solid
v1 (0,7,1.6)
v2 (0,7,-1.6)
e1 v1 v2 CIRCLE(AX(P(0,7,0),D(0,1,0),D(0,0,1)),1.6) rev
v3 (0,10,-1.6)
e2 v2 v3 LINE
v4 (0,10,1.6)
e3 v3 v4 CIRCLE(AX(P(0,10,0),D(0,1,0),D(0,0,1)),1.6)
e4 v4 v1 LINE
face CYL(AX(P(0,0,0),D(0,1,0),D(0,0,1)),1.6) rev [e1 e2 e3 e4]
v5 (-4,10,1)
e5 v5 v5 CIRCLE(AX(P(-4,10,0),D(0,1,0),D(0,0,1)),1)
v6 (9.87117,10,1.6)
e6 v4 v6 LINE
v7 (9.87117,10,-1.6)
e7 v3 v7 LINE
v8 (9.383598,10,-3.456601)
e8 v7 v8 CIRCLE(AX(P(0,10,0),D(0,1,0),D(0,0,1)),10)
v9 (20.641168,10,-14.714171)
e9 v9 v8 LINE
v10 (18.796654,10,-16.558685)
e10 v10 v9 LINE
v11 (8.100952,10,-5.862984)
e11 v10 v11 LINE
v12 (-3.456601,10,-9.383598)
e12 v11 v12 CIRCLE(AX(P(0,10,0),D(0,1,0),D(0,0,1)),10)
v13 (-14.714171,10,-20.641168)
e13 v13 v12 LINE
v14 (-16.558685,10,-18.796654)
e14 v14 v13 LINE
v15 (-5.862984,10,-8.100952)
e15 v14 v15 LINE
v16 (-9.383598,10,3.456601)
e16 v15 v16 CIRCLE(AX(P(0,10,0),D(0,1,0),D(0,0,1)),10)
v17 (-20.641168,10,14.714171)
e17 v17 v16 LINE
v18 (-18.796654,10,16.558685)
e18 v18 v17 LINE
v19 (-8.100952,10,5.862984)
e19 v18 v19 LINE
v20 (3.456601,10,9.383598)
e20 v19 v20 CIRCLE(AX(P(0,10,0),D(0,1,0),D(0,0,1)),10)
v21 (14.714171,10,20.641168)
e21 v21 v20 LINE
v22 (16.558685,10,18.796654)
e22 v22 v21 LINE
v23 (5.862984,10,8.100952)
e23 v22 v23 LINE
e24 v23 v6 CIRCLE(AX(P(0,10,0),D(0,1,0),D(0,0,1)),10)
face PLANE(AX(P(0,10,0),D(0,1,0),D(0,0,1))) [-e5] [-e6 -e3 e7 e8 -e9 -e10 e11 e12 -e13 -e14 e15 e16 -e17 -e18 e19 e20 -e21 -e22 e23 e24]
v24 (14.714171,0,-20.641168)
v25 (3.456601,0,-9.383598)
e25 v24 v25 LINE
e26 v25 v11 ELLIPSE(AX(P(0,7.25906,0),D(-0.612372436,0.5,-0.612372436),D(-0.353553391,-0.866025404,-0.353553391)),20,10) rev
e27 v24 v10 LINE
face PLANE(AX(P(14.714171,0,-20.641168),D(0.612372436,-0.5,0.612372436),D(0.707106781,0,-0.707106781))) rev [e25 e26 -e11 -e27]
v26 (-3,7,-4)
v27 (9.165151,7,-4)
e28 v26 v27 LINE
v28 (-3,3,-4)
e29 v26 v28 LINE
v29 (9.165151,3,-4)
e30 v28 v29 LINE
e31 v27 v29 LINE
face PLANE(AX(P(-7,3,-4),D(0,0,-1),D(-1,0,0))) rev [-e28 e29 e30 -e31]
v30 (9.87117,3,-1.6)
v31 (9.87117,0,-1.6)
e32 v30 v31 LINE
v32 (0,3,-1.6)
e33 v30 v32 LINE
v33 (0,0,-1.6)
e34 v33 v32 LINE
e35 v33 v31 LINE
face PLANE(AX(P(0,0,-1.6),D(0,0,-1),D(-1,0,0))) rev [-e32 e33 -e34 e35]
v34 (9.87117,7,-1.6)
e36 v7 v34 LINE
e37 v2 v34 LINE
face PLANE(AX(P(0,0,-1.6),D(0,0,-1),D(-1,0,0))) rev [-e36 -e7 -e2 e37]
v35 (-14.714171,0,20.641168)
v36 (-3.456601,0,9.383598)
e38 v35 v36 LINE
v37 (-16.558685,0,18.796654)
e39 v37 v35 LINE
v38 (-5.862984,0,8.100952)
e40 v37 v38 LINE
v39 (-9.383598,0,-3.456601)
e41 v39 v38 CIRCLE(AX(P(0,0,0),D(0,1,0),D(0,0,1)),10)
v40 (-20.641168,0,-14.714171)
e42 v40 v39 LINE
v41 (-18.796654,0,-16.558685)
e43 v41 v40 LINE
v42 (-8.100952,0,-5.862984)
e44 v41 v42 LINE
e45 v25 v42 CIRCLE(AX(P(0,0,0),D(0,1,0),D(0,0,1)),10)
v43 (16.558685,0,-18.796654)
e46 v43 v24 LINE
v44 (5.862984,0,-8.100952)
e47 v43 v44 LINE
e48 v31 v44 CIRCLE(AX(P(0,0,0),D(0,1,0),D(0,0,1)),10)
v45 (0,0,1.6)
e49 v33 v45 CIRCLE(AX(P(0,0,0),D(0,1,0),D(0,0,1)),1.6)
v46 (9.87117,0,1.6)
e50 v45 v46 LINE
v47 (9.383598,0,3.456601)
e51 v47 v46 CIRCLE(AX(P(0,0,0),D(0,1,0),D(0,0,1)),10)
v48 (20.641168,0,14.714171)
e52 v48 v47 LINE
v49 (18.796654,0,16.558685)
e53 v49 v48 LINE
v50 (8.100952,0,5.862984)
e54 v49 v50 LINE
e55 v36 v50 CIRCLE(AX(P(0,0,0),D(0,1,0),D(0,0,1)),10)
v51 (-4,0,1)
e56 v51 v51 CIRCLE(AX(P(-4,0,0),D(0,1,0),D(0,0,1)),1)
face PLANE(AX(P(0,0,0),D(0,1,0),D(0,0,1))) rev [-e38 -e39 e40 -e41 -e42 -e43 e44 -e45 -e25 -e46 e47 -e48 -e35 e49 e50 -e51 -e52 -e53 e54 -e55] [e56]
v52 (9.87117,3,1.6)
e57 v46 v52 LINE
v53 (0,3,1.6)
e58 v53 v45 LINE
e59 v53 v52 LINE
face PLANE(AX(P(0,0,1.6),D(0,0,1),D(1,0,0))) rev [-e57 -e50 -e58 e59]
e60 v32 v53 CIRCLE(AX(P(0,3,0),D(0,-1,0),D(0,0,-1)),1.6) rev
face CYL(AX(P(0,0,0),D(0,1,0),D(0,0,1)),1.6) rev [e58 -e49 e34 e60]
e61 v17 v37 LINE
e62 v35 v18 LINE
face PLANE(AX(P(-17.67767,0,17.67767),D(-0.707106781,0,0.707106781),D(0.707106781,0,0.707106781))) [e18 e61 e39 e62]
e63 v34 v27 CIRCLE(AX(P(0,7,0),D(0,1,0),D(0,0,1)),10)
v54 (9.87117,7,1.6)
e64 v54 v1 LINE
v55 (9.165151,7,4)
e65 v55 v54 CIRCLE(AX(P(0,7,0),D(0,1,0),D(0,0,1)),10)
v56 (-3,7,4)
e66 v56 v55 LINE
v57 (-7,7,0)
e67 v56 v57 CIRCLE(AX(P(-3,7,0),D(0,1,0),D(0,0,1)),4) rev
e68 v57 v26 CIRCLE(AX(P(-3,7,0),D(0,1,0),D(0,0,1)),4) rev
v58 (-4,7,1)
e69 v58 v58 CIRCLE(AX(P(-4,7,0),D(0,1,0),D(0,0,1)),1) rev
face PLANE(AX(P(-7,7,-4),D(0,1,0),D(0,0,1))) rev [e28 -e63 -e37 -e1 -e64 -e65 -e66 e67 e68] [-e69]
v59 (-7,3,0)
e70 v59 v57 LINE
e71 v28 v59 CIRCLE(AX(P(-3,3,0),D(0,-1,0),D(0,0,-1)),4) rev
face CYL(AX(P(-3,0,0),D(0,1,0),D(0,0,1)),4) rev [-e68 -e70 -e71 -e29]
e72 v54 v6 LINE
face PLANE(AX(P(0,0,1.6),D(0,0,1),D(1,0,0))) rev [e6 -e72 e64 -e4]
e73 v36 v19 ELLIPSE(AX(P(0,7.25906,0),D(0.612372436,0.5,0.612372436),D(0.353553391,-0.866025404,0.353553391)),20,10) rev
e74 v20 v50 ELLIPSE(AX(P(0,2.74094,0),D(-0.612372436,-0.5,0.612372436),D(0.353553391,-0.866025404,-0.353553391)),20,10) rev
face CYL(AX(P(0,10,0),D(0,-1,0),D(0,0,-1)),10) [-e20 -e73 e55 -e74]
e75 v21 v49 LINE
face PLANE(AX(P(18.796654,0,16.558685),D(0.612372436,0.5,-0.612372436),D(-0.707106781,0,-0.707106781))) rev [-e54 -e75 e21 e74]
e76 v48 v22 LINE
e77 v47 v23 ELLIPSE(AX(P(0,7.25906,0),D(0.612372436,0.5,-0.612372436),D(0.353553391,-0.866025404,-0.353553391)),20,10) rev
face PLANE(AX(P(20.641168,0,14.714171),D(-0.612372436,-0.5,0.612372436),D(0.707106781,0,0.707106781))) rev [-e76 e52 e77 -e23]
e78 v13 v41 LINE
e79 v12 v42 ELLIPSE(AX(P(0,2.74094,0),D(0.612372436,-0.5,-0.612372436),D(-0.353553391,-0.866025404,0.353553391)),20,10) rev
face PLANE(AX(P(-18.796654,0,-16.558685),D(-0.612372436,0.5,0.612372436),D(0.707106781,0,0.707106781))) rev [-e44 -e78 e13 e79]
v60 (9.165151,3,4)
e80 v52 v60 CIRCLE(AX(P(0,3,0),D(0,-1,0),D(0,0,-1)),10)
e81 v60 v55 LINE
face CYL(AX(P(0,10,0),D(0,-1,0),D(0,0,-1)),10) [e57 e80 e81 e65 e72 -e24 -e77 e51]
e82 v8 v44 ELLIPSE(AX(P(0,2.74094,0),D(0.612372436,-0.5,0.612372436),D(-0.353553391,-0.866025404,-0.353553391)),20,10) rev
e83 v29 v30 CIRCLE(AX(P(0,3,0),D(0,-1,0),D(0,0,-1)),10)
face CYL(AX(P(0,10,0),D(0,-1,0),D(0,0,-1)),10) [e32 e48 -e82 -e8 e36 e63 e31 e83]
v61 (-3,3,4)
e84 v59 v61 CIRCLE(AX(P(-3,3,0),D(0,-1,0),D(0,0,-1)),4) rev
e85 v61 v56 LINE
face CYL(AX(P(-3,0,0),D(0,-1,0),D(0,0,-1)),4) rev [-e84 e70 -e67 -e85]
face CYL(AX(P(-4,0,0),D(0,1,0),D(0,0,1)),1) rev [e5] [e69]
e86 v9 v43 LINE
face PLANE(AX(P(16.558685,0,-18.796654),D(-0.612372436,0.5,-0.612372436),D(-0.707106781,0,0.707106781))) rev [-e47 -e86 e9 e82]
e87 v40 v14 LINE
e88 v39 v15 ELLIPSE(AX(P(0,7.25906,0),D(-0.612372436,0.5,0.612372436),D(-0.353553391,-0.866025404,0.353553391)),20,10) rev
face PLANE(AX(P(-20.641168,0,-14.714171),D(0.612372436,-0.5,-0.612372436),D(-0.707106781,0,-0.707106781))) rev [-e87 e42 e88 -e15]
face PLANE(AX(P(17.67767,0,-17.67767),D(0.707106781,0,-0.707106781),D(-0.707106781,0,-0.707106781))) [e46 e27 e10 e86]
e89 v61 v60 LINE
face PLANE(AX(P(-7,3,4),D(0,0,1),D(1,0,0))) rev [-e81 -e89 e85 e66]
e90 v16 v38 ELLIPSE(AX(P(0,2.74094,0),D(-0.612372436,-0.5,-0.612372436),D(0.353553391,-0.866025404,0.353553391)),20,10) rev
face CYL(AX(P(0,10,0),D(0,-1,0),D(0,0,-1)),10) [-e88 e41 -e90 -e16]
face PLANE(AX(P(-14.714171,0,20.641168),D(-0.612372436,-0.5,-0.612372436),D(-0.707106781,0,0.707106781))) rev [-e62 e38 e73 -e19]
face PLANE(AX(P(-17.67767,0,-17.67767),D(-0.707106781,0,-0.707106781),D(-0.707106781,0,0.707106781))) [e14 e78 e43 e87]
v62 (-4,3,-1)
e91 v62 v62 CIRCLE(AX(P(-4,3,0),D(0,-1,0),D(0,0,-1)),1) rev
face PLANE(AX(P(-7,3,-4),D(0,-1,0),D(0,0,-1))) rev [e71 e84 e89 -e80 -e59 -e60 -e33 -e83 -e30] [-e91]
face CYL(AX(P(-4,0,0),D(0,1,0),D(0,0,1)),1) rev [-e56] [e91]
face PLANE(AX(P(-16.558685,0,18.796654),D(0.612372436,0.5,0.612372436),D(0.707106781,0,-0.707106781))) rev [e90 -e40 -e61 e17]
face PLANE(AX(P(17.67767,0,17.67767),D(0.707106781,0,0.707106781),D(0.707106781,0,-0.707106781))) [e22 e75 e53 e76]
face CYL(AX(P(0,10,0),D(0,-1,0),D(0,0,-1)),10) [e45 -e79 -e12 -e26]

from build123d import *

# Parameters (mm, degrees)
SKETCH1_R           = 10
BOSS_EXTRUDE1_DEPTH = 10
SKETCH3_R           = 1.6
CUT_EXTRUDE2_DEPTH  = 18.320508076
SKETCH7_W           = 3.2
SKETCH7_H           = 10
CUT_EXTRUDE6_DEPTH  = 10
SKETCH9_R           = 1
CUT_EXTRUDE7_DEPTH  = 18.320508076
SKETCH10_W          = 8
SKETCH10_H          = 4
CUT_EXTRUDE8_DEPTH  = 17
FILLET1_R           = 4
BOSS_EXTRUDE3_START = -0.920608418
BOSS_EXTRUDE3_DEPTH = 15.920608418
CIRPATTERN2_COUNT   = 4


# Read off the part's stored shape, not the designer's step: Boss-Extrude3
with BuildPart() as part:
    # Sketch1 → Boss-Extrude1 (new body)
    with BuildSketch(Plane(origin=(0, 0, 0), x_dir=(1, 0, 0), z_dir=(0, 1, 0))):
        with Locations(Location((0, 0, 0), (0, 0, 270))):
            Circle(SKETCH1_R)
    extrude(amount=BOSS_EXTRUDE1_DEPTH)

    # Sketch3 → Cut-Extrude2 (cut, through all)
    with BuildSketch(Plane(origin=(0, 10, 0), x_dir=(1, 0, 0), z_dir=(0, 1, 0))):
        with Locations(Location((0, 0, 0), (0, 0, 270))):
            Circle(SKETCH3_R)
    extrude(amount=-CUT_EXTRUDE2_DEPTH, mode=Mode.SUBTRACT)

    # Sketch7 → Cut-Extrude6 (cut)
    with BuildSketch(Plane(origin=(10, 0, 0), x_dir=(0, 0, -1), z_dir=(1, 0, 0))):
        with Locations((0, 5)):
            Rectangle(SKETCH7_W, SKETCH7_H)
    extrude(amount=-CUT_EXTRUDE6_DEPTH, mode=Mode.SUBTRACT)

    # Sketch9 → Cut-Extrude7 (cut, through all)
    with BuildSketch(Plane(origin=(0, 10, 0), x_dir=(1, 0, 0), z_dir=(0, 1, 0))):
        with Locations(Location((-4, 0, 0), (0, 0, 270))):
            Circle(SKETCH9_R)
    extrude(amount=-CUT_EXTRUDE7_DEPTH, mode=Mode.SUBTRACT)

    # Sketch10 → Cut-Extrude8 (cut)
    with BuildSketch(Plane(origin=(10, 0, 0), x_dir=(0, 0, -1), z_dir=(1, 0, 0))):
        with Locations((0, 5)):
            Rectangle(SKETCH10_W, SKETCH10_H)
    extrude(amount=-CUT_EXTRUDE8_DEPTH, mode=Mode.SUBTRACT)

    # Fillet1
    fillet1_edges = [part.edges().sort_by_distance(p)[0] for p in [
        (-7, 5, 4),
        (-7, 5, -4),
    ]]
    fillet(fillet1_edges, radius=FILLET1_R - 0.0001)  # a hair under: the kernel refuses the full size

    # Boss-Extrude3 outline → Boss-Extrude3 (add)
    with BuildSketch(Plane(origin=(7.071067812, 0, 7.071067812), x_dir=(0.7071067811865476, 0, -0.7071067811865476), z_dir=(0.7071067811865476, 0, 0.7071067811865476)).offset(BOSS_EXTRUDE3_START)):
        Polygon((4.191019983, 0), (-1.582482709, 10), (-4.191019983, 10), (1.582482709, 0), align=None)
    boss_extrude3 = extrude(amount=BOSS_EXTRUDE3_DEPTH)

    # CirPattern2: Boss-Extrude3 ×4 about axis
    cirpattern2_axis = Axis((0, 0, 0), (0, 1, 0))
    for i in range(1, CIRPATTERN2_COUNT):
        add(boss_extrude3.rotate(cirpattern2_axis, i * 360 / CIRPATTERN2_COUNT))


solid = part.part
